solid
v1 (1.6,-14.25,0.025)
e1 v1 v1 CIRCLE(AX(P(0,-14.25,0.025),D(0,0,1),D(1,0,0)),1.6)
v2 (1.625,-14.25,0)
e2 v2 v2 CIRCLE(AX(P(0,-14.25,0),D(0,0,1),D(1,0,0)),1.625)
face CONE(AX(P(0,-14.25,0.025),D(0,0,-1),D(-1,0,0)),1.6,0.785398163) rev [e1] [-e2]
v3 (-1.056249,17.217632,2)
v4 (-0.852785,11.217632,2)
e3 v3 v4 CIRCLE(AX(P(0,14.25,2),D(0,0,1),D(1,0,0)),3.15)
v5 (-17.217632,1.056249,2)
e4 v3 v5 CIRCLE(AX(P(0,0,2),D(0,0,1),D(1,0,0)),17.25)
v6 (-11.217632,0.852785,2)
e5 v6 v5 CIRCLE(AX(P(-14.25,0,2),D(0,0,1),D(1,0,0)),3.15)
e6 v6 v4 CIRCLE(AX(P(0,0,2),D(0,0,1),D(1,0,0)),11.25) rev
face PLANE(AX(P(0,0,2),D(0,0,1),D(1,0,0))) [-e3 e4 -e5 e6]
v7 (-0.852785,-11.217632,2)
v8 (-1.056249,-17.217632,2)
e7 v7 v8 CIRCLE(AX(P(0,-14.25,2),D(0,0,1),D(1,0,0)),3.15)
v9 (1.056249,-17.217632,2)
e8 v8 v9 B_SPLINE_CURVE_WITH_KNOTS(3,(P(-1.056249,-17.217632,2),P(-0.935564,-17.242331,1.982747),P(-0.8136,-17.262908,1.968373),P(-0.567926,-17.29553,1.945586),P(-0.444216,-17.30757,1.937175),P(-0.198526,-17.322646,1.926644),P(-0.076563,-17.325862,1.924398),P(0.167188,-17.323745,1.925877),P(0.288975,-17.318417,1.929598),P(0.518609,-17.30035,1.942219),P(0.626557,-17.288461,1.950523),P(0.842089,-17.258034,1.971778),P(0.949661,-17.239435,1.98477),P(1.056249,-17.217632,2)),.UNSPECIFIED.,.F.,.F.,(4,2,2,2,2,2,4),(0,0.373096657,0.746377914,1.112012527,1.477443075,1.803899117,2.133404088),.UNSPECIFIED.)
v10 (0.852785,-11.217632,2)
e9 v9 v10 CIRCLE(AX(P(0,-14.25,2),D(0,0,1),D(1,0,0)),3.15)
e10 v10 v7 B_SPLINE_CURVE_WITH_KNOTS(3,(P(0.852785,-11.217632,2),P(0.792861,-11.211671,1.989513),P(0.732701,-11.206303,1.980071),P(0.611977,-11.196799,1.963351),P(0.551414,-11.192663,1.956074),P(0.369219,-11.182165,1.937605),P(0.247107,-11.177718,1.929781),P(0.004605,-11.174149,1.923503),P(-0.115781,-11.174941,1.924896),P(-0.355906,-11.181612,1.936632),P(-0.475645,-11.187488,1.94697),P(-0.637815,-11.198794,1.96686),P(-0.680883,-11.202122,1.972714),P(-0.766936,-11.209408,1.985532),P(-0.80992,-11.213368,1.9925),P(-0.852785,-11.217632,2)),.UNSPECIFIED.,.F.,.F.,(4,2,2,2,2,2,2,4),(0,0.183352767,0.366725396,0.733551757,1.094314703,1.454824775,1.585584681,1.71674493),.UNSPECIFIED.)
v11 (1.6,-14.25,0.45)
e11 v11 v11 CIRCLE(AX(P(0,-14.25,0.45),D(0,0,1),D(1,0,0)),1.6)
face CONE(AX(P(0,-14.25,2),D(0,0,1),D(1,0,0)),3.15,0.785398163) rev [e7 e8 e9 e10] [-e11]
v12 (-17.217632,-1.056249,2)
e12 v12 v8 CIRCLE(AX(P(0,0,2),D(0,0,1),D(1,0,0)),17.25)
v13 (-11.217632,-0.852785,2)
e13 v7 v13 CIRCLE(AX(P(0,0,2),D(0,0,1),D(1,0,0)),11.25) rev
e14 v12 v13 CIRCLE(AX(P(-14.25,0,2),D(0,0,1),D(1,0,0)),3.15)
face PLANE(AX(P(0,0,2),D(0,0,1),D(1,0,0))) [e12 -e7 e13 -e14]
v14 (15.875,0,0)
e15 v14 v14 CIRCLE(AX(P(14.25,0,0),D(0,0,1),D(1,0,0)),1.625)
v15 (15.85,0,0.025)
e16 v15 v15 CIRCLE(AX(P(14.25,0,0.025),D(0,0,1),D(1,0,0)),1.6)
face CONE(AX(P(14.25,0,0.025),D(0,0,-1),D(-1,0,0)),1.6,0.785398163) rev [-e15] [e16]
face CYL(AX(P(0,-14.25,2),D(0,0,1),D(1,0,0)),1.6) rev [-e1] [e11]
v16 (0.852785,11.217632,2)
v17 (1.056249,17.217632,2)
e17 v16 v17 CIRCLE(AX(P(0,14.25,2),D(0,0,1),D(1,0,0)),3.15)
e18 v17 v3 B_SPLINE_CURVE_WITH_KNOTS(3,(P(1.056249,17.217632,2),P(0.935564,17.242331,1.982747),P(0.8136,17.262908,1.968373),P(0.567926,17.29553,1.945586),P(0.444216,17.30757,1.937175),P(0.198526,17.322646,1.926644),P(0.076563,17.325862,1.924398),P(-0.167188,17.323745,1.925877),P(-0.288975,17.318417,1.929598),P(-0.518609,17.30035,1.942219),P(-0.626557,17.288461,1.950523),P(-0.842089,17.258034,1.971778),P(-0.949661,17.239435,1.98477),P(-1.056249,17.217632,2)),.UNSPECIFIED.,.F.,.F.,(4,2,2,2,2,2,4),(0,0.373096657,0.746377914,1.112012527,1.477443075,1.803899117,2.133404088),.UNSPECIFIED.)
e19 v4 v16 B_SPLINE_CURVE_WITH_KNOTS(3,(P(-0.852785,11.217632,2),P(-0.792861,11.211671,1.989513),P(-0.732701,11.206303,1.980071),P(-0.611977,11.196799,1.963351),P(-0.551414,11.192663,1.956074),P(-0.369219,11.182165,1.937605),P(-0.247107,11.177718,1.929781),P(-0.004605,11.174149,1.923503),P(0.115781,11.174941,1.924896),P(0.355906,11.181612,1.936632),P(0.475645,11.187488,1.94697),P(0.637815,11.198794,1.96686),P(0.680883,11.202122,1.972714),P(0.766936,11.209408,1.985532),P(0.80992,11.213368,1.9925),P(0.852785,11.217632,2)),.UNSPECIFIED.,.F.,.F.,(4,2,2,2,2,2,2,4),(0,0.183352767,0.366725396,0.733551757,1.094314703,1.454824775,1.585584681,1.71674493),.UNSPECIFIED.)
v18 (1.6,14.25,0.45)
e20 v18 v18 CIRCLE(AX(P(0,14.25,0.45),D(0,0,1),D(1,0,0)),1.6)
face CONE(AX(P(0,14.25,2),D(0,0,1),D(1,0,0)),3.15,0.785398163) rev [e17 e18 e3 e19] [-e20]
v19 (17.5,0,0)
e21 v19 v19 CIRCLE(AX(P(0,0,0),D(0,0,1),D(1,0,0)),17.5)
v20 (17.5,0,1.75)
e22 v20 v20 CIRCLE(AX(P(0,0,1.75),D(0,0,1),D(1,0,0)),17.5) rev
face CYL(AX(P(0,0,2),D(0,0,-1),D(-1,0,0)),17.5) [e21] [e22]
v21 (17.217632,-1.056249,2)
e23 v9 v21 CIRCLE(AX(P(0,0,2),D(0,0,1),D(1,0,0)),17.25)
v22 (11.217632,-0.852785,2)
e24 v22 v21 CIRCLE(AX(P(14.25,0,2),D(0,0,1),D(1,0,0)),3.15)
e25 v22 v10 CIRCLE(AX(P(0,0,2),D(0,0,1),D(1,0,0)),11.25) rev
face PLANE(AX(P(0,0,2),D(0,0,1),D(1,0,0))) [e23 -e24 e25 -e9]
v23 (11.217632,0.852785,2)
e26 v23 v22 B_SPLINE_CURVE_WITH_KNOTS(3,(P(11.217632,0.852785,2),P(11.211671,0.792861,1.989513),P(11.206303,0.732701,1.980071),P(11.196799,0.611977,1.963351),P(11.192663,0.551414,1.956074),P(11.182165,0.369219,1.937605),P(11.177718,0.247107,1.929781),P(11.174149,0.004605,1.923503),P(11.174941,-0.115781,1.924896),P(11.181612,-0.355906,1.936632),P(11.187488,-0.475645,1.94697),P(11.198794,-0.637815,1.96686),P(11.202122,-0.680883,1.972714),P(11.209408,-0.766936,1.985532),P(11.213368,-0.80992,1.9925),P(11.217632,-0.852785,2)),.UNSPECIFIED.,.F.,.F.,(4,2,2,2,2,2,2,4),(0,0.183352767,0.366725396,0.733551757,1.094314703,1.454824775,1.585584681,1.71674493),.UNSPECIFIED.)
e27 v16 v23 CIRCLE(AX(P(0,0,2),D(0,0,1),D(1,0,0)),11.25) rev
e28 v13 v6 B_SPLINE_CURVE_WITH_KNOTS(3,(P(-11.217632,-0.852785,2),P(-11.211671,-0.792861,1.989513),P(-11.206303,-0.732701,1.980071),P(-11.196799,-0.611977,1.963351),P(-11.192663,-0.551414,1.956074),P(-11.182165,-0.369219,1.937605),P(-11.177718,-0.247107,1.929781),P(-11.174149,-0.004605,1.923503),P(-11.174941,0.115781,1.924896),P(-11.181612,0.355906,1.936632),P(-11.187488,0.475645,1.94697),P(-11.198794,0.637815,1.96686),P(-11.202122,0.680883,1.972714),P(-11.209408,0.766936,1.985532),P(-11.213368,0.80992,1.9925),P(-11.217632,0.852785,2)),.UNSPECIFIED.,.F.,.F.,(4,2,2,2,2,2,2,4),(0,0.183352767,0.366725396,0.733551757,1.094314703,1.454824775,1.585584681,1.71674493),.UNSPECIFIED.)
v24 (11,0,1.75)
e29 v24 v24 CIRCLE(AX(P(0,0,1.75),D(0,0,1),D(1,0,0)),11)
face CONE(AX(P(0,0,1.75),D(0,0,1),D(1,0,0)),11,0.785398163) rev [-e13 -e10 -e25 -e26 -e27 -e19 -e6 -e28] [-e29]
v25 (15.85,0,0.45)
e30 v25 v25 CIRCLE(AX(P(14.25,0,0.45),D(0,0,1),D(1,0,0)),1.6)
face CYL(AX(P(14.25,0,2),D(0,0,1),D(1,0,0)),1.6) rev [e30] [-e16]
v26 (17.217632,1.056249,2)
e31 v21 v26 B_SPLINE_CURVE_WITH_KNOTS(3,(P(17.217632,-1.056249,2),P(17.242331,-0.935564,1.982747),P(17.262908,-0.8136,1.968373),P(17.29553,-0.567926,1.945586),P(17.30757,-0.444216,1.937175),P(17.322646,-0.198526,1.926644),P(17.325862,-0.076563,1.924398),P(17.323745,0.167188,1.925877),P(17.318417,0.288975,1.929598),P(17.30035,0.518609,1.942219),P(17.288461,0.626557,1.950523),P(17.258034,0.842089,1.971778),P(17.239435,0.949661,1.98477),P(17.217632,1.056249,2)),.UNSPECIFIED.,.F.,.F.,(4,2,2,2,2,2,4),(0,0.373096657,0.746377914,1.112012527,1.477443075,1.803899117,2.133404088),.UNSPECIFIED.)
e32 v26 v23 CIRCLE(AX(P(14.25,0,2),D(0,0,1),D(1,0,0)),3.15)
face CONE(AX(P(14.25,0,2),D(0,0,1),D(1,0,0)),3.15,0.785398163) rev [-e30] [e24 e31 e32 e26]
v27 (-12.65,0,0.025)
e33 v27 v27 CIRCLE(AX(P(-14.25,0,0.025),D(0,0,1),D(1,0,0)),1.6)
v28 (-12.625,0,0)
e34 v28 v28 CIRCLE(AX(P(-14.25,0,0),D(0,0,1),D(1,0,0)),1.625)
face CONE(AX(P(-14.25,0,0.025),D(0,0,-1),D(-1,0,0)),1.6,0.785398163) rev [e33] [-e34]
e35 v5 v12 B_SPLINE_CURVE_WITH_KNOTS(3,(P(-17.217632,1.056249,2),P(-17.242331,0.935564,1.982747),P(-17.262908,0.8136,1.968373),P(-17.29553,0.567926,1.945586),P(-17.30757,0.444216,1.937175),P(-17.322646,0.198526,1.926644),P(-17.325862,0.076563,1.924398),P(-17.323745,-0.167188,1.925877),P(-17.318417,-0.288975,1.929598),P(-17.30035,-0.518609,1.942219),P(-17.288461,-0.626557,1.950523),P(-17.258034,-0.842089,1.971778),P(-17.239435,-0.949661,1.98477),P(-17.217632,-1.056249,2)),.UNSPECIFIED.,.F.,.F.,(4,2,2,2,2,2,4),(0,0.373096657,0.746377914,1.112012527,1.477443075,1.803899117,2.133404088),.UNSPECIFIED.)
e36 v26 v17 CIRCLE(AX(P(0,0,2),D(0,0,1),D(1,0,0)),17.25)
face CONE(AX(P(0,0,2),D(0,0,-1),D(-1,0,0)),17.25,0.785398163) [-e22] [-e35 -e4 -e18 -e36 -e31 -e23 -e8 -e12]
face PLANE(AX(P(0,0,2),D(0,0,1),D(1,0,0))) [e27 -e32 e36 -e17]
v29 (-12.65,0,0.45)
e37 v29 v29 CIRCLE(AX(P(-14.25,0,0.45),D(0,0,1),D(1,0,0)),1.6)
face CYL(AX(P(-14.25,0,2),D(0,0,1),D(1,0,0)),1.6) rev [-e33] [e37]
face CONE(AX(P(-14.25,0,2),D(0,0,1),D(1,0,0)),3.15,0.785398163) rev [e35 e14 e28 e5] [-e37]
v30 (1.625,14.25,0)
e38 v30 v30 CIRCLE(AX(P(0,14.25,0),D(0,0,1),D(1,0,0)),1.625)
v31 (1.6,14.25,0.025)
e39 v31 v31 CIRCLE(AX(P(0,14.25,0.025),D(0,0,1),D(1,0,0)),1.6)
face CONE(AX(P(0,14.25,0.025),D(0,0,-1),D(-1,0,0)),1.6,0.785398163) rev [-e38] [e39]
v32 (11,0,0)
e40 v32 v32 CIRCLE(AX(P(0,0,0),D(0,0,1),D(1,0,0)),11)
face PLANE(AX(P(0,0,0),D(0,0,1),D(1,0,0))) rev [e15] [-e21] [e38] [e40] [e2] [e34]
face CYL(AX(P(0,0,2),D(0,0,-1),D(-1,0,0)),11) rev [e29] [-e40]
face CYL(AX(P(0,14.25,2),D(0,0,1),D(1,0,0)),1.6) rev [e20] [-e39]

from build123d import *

# Parameters (mm, degrees)
SKETCH_1_R                  = 17.5
SKETCH_1_R_2                = 11
EXTRUDE_1_DEPTH             = 2
HOLE_WIZARD_M3_1_AT_2_COUNT = 2
HOLE_WIZARD_M3_1_AT_2_PITCH = 20.152543264
HOLE_WIZARD_M3_1_AT_3_COUNT = 2
HOLE_WIZARD_M3_1_AT_3_PITCH = 28.5
HOLE_WIZARD_M3_1_AT_4_COUNT = 2
HOLE_WIZARD_M3_1_AT_4_PITCH = 20.152543264
HOLE_WIZARD_M3_1_AT_5_COUNT = 2
HOLE_WIZARD_M3_1_AT_5_PITCH = 14.25
CHAMFER_1_SIZE              = 0.25


with BuildPart() as part:
    # ｽｹｯﾁ1 → ﾎﾞｽ - 押し出し1 (new body)
    with BuildSketch(Plane.XY):
        Circle(SKETCH_1_R)
        Circle(SKETCH_1_R_2, mode=Mode.SUBTRACT)
    extrude(amount=EXTRUDE_1_DEPTH)

    # ｽｹｯﾁ4 → M3 丸皿ねじ用皿穴1 (revolve, cut)
    with BuildSketch(Plane(origin=(0, 14.25, 2), x_dir=(0, -1, 0), z_dir=(1, 0, 0))):
        Polygon((0, 0), (0, 2), (1.625, 2), (1.6, 1.975), (1.6, 1.55), (3.15, 0), align=None)
    hole_wizard_m3_1 = revolve(axis=Axis((0, 14.25, 8.35), (0, 0, -1)), mode=Mode.SUBTRACT)

    # M3 丸皿ねじ用皿穴1 at 2: M3 丸皿ねじ用皿穴1 ×2
    with Locations(*[Vector(0.7071067811865476, -0.7071067811865476, 0) * (i * HOLE_WIZARD_M3_1_AT_2_PITCH) for i in range(1, HOLE_WIZARD_M3_1_AT_2_COUNT)]):
        add(hole_wizard_m3_1, mode=Mode.SUBTRACT)

    # M3 丸皿ねじ用皿穴1 at 3: M3 丸皿ねじ用皿穴1 ×2
    with Locations(*[(0, -i * HOLE_WIZARD_M3_1_AT_3_PITCH, 0) for i in range(1, HOLE_WIZARD_M3_1_AT_3_COUNT)]):
        add(hole_wizard_m3_1, mode=Mode.SUBTRACT)

    # M3 丸皿ねじ用皿穴1 at 4: M3 丸皿ねじ用皿穴1 ×2
    with Locations(*[Vector(-0.7071067811865476, -0.7071067811865476, 0) * (i * HOLE_WIZARD_M3_1_AT_4_PITCH) for i in range(1, HOLE_WIZARD_M3_1_AT_4_COUNT)]):
        add(hole_wizard_m3_1, mode=Mode.SUBTRACT)

    # M3 丸皿ねじ用皿穴1 at 5: M3 丸皿ねじ用皿穴1 ×2
    with Locations(*[(0, -i * HOLE_WIZARD_M3_1_AT_5_PITCH, 0) for i in range(1, HOLE_WIZARD_M3_1_AT_5_COUNT)]):
        add(hole_wizard_m3_1, mode=Mode.SUBTRACT)

    # 面取り1
    # the kernel refuses this chamfer: 0.25 mm, written as the material it takes off along each edge
    with BuildSketch(Plane(origin=(0, 0, 2), x_dir=(1, 0, 0), z_dir=(0, -1, 0))) as chamfer_1_piece_1:
        Polygon((17.5, -CHAMFER_1_SIZE), (17.5 - CHAMFER_1_SIZE, 0), (17.5, 0), align=None)
    revolve(axis=Axis((0, 0, 2), (0, 0, 1)), mode=Mode.SUBTRACT)
    with BuildSketch(Plane(origin=(0, 0, 2), x_dir=(1, 0, 0), z_dir=(0, -1, 0))) as chamfer_1_piece_2:
        Polygon((11 + CHAMFER_1_SIZE, 0), (11, -CHAMFER_1_SIZE), (11, 0), align=None)
    revolve(axis=Axis((0, 0, 2), (0, 0, 1)), mode=Mode.SUBTRACT)


solid = part.part
